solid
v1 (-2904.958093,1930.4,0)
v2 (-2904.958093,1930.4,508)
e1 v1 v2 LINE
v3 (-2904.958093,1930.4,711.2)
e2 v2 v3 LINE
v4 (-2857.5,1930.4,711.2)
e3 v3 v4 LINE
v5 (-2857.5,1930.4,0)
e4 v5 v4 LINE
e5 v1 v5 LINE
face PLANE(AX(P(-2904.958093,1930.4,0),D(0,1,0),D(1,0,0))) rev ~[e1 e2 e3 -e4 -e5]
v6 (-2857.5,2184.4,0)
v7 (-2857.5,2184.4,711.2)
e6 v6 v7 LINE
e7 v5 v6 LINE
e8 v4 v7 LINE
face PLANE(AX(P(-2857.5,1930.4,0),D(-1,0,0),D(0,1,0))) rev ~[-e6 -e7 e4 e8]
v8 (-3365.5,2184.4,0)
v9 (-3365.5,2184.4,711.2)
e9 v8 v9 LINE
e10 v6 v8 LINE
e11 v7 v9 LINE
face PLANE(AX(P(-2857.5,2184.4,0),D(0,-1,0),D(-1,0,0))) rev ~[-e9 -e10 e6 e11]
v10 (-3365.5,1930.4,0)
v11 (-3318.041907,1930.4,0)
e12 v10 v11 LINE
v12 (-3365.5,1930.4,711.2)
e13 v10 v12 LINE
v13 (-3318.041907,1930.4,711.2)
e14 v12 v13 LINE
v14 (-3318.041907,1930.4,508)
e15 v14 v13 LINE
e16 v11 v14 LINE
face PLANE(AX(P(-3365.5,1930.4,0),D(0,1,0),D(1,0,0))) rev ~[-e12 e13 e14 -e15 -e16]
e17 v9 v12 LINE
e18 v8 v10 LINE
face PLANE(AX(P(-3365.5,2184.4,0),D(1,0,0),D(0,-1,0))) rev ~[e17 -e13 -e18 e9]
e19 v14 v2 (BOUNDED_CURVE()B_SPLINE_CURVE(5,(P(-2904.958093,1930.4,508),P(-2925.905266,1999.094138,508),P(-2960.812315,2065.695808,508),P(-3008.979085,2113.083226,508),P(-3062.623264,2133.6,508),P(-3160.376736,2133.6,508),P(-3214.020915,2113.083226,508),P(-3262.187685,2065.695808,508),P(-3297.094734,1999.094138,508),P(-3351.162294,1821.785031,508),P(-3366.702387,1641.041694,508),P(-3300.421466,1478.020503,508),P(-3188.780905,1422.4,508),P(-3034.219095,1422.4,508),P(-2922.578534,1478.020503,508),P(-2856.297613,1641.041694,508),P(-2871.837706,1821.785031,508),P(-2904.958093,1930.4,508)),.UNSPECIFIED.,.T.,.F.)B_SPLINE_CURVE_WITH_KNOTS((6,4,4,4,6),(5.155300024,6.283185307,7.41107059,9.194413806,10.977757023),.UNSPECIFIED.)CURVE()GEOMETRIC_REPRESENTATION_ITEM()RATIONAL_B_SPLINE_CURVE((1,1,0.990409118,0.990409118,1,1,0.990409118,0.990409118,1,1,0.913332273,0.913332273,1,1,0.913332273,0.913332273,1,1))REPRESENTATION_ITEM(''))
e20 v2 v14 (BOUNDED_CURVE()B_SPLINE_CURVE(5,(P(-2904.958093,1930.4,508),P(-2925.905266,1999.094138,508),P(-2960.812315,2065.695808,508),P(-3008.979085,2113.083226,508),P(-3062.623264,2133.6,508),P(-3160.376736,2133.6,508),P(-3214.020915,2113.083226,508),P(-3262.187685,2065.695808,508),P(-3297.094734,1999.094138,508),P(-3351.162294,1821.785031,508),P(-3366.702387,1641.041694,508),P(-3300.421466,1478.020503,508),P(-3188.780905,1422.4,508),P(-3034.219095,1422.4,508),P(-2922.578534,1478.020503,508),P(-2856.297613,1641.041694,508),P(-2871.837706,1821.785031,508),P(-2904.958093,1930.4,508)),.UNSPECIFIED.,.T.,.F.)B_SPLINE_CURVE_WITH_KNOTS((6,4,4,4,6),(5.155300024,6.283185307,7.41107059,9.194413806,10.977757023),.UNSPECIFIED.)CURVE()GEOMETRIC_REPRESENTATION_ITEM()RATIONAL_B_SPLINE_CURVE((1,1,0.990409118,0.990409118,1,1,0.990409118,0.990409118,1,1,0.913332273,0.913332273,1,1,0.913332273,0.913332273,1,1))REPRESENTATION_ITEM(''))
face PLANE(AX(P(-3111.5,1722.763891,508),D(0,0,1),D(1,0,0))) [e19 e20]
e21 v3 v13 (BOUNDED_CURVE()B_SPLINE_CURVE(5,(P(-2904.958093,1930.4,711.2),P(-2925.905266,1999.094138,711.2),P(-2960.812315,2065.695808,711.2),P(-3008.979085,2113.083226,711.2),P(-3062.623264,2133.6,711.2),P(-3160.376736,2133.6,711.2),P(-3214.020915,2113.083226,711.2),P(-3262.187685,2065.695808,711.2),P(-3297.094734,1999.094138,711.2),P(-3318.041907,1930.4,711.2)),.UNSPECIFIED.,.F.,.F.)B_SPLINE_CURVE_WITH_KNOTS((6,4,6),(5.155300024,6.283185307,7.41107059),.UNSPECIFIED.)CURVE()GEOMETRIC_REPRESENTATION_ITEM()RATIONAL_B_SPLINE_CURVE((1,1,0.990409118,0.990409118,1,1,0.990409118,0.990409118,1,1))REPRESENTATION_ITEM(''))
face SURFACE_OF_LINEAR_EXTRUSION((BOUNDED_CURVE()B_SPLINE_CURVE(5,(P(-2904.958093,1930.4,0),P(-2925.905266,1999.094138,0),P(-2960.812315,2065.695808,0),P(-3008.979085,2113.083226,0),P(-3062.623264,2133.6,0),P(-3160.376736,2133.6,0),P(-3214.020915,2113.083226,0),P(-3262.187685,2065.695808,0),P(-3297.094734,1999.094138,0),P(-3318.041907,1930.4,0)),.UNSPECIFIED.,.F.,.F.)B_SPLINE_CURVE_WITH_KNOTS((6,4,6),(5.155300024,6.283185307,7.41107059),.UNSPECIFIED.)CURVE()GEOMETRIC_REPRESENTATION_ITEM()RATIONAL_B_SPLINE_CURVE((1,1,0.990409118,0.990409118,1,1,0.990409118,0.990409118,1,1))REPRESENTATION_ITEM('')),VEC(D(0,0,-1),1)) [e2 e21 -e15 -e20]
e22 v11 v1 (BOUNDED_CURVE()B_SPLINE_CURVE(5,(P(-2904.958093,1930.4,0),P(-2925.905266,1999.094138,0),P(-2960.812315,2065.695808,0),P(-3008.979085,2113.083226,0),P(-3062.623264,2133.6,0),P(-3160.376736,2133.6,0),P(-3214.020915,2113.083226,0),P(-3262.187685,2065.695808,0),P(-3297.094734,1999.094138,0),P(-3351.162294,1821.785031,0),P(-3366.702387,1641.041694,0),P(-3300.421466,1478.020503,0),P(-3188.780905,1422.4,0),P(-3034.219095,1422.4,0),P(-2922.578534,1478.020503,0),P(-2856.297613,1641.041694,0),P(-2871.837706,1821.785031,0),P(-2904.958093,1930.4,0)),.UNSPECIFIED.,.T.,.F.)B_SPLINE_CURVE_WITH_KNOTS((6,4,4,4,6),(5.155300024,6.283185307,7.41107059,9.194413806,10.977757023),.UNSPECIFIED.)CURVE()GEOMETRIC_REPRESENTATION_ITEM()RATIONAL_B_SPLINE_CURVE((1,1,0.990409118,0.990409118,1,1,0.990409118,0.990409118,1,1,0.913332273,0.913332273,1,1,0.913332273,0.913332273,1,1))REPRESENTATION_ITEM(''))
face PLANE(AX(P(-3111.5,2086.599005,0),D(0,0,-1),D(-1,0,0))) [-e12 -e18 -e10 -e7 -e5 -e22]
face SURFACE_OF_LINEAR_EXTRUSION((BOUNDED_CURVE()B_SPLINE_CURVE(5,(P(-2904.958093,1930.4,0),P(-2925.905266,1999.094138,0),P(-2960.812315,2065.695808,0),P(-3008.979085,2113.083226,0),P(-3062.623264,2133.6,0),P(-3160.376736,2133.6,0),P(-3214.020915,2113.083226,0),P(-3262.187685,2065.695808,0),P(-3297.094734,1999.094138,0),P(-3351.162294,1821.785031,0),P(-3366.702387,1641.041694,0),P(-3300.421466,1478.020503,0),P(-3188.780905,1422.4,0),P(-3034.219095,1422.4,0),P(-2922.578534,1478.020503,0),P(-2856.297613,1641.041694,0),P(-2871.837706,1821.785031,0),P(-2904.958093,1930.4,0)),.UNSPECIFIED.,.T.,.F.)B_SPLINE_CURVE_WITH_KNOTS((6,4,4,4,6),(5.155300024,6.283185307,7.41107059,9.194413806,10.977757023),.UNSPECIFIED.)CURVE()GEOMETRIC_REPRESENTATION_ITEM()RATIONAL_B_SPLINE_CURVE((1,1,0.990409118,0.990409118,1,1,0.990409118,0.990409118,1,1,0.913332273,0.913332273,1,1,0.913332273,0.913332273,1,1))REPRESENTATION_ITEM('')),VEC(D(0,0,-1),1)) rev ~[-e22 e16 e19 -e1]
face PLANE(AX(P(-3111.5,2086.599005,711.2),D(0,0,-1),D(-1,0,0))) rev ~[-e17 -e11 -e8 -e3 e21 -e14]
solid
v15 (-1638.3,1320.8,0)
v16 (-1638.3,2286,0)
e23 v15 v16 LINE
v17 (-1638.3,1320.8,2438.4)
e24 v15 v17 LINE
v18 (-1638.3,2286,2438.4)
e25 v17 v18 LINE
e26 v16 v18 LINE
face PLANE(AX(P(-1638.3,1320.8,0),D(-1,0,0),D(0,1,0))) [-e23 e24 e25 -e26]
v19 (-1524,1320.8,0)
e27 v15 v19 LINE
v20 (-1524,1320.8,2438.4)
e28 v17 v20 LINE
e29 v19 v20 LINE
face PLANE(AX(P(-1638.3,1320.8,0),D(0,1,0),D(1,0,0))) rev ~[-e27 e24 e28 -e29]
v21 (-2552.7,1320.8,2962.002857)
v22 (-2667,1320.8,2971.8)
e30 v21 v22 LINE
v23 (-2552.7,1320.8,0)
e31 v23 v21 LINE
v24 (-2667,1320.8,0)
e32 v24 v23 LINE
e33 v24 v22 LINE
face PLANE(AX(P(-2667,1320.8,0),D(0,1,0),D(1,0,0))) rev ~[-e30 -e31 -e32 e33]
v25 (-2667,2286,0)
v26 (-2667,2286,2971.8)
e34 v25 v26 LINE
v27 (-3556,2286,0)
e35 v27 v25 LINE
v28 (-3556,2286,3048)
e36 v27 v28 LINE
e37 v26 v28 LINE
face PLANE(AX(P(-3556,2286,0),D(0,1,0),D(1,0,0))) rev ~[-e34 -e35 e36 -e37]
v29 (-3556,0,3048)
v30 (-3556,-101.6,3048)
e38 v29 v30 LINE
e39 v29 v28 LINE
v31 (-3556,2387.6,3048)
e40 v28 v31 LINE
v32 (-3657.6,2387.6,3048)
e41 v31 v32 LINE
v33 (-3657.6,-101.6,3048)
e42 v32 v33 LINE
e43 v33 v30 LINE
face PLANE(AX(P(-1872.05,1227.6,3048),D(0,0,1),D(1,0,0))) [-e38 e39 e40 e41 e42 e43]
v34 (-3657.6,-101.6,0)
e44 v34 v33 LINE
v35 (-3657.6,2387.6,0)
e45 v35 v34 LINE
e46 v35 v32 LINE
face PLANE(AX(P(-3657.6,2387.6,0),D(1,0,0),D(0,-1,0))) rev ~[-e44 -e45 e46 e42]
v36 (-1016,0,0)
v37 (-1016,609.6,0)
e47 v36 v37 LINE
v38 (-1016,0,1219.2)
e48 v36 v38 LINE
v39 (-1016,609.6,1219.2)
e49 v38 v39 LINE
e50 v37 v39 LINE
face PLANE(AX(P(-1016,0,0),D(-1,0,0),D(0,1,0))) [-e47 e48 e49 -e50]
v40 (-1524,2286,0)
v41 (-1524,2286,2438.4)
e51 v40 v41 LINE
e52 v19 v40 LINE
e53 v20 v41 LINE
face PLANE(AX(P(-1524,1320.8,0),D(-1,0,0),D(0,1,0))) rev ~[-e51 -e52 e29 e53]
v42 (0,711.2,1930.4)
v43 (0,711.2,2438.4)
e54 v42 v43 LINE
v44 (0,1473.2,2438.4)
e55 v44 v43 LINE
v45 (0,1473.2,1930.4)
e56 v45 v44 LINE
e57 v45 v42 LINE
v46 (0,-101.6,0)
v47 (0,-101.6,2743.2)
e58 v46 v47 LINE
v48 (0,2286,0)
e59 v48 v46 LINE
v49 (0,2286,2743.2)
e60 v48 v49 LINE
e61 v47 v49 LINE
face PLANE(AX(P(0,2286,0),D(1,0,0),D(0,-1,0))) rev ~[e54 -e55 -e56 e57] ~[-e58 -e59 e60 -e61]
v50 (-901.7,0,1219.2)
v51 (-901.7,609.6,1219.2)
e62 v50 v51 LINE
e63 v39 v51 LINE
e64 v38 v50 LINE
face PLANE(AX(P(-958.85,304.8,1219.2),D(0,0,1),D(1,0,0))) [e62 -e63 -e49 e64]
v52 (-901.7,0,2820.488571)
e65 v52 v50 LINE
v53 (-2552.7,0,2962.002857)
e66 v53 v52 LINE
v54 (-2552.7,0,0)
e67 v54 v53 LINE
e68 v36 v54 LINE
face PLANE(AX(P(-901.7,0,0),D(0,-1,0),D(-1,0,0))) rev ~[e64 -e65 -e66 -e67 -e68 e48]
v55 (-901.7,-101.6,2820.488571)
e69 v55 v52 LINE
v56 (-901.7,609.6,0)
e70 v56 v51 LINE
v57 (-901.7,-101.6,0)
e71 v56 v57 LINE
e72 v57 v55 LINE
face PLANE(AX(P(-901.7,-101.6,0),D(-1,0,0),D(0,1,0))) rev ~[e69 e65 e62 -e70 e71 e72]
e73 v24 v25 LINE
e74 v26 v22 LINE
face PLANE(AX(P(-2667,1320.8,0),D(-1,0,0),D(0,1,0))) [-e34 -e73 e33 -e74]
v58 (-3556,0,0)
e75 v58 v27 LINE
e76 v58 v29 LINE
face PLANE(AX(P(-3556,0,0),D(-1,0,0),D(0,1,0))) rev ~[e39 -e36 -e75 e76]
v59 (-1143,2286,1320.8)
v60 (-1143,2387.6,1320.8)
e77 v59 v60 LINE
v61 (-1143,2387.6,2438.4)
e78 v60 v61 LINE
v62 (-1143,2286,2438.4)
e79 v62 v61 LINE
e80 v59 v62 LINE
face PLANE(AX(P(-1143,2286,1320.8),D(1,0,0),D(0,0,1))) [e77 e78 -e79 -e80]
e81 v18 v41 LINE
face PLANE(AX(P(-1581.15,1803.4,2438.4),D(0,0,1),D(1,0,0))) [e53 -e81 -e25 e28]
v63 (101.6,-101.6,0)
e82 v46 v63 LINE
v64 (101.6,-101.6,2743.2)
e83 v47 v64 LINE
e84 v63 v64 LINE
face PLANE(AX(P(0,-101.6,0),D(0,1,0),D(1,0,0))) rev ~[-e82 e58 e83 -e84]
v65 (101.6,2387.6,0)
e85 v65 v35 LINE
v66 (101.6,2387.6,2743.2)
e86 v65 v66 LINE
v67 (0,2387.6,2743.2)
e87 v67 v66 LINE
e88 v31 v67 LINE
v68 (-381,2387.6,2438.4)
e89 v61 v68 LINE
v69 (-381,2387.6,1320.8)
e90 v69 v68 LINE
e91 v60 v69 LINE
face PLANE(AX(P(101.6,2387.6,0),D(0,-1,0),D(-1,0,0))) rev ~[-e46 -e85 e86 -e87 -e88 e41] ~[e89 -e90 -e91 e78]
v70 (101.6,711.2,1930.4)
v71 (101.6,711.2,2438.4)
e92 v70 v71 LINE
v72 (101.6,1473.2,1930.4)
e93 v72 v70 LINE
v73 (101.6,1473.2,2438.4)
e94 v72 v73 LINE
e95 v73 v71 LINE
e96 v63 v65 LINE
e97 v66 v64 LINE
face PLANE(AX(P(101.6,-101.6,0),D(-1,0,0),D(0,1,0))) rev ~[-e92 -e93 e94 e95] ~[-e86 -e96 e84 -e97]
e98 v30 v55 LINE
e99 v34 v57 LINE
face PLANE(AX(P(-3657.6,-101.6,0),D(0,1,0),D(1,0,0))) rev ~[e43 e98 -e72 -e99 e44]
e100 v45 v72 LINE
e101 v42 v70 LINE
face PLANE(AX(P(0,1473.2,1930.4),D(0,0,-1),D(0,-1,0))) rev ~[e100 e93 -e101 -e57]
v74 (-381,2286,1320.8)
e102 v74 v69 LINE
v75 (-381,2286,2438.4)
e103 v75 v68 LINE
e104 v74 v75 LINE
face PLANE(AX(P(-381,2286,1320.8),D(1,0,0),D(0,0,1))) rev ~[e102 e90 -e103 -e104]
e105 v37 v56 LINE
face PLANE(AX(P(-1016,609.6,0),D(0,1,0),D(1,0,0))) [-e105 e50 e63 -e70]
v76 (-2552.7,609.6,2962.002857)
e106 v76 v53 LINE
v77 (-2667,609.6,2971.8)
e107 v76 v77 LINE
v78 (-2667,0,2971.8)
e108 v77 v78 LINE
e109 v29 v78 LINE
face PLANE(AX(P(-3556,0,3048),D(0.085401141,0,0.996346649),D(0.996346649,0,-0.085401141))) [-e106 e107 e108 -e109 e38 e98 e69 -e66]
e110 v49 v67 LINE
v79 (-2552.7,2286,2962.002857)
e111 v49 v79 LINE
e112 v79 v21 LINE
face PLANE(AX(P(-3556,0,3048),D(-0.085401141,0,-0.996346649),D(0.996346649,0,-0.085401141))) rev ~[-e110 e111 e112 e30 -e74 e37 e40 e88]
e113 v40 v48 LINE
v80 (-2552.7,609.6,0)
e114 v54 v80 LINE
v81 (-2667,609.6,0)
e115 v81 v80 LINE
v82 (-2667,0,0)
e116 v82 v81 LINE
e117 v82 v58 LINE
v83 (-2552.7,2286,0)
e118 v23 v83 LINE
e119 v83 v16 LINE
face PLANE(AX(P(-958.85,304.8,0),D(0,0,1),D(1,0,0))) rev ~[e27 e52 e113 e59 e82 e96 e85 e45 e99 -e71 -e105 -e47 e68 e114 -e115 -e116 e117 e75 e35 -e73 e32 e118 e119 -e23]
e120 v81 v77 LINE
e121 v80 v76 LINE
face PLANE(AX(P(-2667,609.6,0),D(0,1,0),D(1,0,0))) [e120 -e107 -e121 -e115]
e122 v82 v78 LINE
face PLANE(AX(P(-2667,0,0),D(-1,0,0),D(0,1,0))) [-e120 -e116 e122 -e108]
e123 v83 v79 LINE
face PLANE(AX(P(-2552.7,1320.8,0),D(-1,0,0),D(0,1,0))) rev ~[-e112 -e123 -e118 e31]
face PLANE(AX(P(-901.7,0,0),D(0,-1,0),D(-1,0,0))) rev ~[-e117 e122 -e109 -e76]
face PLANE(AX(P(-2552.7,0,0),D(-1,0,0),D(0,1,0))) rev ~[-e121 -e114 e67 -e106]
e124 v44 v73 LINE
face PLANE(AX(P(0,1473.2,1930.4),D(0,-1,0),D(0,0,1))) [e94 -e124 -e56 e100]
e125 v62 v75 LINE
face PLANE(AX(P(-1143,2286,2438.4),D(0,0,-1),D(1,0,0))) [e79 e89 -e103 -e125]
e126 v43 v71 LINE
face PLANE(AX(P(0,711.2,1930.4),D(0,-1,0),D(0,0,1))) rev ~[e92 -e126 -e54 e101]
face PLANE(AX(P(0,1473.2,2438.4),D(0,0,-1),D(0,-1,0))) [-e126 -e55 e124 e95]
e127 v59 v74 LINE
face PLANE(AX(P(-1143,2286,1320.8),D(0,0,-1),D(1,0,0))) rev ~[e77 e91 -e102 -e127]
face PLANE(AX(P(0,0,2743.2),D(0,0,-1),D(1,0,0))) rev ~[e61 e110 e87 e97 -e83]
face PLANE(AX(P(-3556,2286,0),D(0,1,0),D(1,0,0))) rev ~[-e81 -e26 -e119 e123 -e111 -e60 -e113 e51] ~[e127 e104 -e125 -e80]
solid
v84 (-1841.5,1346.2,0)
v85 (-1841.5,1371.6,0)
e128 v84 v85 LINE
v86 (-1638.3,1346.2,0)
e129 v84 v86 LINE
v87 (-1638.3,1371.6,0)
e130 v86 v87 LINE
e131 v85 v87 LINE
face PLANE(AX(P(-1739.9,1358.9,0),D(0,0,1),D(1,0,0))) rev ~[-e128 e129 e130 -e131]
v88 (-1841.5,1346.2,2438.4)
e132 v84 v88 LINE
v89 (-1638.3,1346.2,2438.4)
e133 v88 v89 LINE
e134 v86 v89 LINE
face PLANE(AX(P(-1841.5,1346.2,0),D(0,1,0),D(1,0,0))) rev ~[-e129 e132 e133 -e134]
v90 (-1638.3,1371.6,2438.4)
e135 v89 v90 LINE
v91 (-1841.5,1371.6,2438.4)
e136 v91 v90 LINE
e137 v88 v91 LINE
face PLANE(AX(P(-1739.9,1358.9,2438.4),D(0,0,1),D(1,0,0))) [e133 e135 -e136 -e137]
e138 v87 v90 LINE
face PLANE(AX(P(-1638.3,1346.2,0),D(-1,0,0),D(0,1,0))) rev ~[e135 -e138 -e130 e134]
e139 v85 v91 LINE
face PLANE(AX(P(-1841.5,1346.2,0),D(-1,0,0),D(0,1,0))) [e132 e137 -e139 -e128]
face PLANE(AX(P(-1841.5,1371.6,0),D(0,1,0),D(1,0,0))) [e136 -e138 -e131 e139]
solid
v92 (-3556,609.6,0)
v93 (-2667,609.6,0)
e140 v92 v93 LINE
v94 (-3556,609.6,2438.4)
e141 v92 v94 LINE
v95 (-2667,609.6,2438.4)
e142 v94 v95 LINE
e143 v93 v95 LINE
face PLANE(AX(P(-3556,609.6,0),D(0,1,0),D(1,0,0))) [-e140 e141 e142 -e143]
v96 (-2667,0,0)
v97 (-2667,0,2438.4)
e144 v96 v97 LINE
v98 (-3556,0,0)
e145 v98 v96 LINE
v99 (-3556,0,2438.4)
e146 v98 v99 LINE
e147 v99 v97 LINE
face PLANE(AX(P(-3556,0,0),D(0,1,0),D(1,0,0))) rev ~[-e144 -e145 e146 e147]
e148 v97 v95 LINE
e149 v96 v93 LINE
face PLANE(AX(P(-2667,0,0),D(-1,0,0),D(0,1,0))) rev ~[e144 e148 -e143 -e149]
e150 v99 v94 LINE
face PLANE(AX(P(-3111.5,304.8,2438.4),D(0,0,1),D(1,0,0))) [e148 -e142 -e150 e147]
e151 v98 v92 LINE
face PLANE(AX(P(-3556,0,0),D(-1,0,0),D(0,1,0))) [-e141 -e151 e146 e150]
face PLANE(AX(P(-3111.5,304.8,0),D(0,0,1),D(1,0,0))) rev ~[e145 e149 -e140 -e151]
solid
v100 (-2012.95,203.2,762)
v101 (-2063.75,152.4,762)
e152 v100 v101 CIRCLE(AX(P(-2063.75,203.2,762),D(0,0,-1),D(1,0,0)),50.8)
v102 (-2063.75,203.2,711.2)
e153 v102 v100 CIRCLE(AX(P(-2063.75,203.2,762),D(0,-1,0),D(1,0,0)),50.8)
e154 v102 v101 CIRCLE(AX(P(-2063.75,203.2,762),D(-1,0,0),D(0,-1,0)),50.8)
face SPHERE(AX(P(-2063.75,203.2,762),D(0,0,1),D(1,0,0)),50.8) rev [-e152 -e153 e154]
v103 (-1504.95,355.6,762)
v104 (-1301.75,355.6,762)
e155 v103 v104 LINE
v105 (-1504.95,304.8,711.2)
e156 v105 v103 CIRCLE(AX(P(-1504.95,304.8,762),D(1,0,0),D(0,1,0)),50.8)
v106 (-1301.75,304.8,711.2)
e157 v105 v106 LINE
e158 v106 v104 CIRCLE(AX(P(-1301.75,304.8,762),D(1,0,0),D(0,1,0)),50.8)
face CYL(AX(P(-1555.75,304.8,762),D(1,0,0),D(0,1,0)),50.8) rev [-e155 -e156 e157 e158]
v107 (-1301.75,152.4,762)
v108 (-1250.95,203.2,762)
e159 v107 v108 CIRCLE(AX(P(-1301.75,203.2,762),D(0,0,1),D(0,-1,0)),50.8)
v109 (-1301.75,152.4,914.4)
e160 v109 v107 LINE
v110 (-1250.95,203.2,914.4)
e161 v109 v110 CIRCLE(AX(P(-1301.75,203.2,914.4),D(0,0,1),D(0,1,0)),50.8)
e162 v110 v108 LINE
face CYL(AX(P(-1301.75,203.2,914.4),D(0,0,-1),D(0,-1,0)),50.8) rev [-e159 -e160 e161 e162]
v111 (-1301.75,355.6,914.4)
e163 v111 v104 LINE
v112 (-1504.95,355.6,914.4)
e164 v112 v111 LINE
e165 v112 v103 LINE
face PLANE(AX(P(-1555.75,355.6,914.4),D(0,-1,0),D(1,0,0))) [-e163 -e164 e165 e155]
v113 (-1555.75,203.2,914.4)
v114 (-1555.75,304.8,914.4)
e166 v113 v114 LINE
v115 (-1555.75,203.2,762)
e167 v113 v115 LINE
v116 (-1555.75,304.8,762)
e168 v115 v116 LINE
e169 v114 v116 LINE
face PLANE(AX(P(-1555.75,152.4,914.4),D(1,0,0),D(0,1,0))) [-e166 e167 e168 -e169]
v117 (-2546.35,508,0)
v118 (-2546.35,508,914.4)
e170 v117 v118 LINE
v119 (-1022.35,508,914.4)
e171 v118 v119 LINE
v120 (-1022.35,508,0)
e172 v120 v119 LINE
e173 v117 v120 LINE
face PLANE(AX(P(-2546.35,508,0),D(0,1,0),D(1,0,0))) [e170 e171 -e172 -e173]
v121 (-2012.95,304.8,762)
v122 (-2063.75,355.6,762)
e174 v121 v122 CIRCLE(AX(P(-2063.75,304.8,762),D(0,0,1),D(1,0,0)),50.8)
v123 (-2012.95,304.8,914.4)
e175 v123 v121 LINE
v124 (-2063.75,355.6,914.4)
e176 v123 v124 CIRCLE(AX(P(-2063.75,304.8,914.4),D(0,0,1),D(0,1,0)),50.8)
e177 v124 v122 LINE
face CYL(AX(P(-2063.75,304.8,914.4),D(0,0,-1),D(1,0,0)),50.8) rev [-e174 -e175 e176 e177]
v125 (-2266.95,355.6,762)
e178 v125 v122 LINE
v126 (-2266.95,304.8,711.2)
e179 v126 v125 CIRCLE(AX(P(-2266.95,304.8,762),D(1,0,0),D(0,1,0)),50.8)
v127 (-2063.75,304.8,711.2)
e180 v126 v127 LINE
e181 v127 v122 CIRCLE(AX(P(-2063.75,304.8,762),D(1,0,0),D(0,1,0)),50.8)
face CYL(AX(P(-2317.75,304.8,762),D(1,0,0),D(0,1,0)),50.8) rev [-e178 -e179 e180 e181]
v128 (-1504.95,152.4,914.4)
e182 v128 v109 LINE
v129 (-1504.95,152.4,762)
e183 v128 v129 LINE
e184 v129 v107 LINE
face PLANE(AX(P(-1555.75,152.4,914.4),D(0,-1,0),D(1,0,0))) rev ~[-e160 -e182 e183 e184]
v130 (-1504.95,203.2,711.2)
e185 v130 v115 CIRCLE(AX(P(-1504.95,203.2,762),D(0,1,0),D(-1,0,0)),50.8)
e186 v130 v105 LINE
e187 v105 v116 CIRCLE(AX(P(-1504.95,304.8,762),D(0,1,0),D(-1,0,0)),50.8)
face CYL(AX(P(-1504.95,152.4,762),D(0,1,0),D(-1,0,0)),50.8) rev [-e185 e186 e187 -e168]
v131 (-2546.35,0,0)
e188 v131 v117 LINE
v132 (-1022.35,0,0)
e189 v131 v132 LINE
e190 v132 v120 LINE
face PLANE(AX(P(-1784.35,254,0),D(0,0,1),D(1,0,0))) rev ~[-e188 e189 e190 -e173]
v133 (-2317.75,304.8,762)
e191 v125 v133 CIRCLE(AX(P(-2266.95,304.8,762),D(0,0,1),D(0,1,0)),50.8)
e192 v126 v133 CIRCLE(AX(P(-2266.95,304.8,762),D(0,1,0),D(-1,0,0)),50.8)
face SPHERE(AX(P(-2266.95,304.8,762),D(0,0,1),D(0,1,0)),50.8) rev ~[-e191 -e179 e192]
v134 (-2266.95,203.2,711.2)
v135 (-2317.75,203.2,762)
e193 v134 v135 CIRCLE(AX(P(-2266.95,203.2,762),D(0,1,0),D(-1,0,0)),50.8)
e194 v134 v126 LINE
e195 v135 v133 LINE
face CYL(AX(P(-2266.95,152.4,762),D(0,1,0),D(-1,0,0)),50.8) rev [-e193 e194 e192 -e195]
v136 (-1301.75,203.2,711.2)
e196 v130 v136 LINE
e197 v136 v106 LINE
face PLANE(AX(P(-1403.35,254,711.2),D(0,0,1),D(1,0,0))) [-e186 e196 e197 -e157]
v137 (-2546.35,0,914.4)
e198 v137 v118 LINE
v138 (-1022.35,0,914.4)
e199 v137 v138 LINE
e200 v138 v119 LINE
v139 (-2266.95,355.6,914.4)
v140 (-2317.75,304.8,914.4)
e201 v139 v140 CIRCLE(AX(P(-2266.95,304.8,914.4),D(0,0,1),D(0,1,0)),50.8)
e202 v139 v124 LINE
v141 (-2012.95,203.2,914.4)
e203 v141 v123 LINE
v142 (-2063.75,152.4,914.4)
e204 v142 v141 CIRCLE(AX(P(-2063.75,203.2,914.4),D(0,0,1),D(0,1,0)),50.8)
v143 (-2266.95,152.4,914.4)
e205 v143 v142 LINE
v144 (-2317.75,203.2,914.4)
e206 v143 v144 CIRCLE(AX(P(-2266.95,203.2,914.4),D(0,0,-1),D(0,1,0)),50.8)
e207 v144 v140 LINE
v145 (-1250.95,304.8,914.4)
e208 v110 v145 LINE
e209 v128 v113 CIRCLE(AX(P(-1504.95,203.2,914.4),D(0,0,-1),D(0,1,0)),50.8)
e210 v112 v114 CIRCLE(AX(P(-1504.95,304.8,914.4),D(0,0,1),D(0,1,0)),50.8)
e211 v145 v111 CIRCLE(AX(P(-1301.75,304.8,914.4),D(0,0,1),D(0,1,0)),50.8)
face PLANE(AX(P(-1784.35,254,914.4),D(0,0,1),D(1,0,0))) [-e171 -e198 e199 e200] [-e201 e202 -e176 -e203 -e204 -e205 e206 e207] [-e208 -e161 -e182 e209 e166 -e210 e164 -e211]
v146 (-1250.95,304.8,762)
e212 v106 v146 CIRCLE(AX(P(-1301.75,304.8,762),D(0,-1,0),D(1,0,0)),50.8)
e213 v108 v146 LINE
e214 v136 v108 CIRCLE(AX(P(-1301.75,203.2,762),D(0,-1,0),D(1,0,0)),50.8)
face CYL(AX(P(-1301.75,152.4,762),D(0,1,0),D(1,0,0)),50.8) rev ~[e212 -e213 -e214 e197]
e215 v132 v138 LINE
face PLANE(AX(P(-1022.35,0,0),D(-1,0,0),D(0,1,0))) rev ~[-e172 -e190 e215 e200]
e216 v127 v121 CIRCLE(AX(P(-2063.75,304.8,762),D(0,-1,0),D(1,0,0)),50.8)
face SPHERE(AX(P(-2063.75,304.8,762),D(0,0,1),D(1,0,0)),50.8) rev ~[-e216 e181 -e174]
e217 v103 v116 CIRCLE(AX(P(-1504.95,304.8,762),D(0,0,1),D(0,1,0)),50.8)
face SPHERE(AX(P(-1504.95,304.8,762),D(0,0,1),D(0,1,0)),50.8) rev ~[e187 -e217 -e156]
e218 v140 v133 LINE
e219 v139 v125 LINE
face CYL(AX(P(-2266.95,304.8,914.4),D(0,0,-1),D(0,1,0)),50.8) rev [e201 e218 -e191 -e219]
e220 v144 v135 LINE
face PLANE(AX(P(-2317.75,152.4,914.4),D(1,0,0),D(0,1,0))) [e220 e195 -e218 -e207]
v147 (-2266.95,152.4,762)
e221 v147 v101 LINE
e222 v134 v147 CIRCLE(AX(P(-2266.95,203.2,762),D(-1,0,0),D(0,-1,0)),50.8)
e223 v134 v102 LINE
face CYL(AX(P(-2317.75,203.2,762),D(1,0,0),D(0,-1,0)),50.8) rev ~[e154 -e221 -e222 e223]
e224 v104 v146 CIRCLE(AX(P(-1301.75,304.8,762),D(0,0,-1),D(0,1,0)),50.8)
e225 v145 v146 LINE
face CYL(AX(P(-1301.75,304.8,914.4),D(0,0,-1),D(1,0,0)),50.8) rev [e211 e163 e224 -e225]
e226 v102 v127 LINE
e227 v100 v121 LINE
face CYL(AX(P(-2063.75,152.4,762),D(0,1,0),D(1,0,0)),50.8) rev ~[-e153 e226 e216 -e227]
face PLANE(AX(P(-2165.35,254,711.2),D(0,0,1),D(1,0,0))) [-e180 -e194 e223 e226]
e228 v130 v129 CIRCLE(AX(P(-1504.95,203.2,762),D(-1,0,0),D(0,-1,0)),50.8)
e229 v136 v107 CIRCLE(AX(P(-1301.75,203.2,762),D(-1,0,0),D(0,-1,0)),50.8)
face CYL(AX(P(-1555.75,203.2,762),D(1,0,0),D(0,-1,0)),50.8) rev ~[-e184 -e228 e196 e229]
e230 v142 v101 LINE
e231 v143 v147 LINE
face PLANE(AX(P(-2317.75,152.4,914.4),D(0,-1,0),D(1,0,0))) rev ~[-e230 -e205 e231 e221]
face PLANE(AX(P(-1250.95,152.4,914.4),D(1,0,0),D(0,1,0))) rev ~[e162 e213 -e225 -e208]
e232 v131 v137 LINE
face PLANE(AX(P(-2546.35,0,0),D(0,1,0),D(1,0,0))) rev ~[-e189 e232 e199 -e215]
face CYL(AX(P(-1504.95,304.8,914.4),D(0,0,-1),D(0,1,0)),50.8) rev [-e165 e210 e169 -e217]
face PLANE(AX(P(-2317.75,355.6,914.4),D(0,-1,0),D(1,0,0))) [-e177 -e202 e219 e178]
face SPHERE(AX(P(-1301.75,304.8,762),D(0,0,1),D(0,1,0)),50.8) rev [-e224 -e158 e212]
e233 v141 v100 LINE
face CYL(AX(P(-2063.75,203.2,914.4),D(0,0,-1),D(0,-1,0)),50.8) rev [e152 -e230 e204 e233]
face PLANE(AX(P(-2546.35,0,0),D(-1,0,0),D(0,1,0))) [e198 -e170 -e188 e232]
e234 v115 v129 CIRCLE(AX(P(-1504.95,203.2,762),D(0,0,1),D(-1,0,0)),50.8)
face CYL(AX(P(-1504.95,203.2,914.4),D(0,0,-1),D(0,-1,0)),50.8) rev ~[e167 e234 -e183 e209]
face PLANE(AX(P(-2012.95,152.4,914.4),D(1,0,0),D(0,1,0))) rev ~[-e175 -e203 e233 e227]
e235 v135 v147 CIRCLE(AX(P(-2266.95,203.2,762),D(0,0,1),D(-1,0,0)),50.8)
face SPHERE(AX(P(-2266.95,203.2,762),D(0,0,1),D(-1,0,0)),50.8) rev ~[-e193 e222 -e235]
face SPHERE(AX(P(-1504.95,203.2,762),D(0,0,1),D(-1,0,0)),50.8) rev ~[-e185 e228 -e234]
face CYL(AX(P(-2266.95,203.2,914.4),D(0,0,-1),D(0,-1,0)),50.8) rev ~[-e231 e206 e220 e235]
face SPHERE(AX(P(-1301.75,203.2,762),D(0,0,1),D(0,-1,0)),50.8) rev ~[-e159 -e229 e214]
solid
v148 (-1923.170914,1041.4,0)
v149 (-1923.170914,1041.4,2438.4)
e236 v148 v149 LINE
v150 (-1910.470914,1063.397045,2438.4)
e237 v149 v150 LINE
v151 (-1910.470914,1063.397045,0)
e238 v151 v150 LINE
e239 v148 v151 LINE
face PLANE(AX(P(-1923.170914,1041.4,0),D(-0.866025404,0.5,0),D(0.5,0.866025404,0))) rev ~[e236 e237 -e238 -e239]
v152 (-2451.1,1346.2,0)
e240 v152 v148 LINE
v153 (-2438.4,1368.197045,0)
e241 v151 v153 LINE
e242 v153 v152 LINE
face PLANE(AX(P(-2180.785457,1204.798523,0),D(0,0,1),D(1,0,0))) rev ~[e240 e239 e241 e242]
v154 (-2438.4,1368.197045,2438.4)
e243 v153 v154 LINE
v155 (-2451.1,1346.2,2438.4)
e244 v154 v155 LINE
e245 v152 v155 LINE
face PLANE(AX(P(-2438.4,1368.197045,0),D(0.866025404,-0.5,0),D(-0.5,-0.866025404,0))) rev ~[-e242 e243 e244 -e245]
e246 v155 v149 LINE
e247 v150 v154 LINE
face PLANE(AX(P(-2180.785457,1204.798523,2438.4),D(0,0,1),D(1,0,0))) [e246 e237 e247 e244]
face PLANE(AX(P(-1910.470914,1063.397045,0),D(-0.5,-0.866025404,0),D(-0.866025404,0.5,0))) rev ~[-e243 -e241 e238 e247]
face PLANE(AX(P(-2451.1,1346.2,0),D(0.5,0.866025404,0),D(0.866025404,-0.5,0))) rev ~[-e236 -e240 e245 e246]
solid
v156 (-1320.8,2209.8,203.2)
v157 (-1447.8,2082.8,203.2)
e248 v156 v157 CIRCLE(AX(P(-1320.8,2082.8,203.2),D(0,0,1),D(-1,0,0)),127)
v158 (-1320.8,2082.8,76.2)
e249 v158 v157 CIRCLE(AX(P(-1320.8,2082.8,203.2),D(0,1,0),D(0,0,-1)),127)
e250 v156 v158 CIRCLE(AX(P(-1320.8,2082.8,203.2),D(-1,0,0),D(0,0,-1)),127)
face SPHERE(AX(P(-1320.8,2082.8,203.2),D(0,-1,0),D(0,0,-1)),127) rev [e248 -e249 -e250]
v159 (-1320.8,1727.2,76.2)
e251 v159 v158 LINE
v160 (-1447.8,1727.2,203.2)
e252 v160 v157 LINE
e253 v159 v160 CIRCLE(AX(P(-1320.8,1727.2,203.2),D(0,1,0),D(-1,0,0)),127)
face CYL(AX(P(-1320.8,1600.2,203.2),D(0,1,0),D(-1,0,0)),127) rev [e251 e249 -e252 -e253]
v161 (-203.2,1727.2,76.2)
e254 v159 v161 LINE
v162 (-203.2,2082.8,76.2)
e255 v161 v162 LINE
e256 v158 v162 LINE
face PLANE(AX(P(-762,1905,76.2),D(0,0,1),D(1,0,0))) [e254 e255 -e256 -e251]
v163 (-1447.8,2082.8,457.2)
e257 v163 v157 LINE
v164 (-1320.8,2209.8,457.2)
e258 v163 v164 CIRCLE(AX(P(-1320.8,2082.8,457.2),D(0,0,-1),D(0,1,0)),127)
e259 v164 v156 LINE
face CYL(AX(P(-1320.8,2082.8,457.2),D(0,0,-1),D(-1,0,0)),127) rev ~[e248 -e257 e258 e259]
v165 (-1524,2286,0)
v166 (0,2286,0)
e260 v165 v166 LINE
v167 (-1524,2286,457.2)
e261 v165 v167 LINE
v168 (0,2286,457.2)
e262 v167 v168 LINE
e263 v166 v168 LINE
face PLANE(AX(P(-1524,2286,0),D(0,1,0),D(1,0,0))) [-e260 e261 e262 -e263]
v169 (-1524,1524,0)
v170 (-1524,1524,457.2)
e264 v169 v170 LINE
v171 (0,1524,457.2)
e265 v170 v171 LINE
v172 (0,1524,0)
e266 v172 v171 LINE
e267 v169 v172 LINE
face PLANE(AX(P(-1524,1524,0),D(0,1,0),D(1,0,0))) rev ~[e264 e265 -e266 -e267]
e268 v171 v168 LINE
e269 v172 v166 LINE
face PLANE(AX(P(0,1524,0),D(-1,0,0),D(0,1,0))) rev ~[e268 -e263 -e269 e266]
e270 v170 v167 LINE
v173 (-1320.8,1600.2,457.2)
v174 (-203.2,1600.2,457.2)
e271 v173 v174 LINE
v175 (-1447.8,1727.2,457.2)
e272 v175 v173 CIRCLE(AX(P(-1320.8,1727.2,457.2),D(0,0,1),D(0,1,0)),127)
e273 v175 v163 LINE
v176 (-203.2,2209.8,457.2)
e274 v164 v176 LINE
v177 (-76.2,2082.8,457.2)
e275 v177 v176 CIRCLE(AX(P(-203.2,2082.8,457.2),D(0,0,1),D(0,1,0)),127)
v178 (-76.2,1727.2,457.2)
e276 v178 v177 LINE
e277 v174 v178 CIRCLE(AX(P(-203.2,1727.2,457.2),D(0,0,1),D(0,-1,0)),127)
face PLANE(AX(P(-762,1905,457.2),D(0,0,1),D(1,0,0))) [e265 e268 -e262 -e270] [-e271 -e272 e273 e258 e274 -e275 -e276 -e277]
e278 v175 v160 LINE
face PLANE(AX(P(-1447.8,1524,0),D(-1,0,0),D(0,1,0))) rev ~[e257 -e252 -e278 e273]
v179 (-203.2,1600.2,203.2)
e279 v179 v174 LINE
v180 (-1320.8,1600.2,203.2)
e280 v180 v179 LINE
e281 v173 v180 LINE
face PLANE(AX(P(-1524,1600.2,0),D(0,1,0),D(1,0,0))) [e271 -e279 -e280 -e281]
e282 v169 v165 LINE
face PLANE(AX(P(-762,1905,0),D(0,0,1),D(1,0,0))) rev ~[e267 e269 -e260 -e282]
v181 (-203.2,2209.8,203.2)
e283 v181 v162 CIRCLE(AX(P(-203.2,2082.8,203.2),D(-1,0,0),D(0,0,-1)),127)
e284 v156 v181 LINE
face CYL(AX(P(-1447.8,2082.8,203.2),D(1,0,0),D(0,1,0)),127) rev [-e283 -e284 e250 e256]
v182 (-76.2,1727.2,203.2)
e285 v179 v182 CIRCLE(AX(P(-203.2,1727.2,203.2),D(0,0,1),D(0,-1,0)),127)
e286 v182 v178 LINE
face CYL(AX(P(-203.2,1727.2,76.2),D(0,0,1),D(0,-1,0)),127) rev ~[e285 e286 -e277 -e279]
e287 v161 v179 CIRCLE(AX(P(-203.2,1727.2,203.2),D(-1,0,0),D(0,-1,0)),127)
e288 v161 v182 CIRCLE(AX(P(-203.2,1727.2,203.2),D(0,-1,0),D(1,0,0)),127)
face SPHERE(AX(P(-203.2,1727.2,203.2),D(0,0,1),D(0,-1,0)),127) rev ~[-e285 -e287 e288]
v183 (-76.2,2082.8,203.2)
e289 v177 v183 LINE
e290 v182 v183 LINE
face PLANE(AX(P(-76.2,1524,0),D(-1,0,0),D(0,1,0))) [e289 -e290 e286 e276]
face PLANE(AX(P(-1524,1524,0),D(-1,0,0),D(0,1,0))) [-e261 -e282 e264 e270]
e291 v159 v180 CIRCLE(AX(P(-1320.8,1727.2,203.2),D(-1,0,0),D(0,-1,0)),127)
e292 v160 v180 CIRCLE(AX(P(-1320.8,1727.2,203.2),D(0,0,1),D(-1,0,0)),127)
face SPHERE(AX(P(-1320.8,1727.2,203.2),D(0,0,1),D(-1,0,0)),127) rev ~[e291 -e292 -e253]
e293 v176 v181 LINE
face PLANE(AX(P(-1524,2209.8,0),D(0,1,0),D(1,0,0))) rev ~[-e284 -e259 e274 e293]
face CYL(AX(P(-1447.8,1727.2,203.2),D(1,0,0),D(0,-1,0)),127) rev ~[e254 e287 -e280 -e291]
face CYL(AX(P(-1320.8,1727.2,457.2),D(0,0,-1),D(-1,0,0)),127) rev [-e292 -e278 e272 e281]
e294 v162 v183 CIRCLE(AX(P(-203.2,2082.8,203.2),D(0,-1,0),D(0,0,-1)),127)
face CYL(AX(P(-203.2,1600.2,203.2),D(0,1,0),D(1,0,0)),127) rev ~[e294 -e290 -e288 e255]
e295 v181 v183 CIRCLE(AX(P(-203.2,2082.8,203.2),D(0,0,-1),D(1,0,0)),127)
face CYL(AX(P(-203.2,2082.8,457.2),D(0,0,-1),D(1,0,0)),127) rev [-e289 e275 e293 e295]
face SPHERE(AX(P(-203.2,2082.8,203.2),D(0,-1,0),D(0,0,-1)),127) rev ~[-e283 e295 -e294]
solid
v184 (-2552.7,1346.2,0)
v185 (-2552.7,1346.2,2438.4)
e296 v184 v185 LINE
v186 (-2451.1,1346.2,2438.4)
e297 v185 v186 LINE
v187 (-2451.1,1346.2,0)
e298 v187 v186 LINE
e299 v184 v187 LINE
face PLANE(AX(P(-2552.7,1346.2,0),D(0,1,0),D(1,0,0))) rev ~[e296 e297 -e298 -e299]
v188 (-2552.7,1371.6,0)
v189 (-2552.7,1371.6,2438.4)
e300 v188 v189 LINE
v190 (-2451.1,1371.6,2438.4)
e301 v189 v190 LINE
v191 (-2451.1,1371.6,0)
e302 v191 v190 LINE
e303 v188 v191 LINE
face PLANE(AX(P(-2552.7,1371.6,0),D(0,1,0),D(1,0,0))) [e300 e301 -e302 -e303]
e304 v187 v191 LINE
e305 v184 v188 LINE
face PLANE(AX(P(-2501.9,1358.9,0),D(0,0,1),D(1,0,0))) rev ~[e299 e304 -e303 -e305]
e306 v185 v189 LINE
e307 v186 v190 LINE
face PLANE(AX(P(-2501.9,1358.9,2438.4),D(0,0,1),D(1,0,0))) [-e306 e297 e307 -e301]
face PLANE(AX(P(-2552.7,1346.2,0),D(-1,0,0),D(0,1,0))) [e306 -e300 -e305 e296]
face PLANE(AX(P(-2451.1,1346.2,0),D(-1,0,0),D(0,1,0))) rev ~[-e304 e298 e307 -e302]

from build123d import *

# Parameters (mm, degrees)
F2_DEPTH      = 3048
F1_W          = 114.3
F1_H          = 965.2
F1_H_2        = 609.6
F3_DEPTH      = 3048
F4_DEPTH      = 2438.4
F5_W          = 101.6
F5_H          = 304.8
F6_DEPTH      = 2387.601
F6_DEPTH_BACK = 101.601
F7_W          = 1524
F7_H          = 762
F8_DEPTH      = 457.2
F9_T          = -76.2
F10_R         = 127
F12_DEPTH     = 2438.4
F11_W         = 203.2
F11_H         = 25.4
F13_DEPTH     = 2438.4
F11_W_2       = 101.6
F14_W         = 762
F14_H         = 1117.6
F15_DEPTH     = 101.601
F16_W         = 1524
F16_H         = 508
F17_DEPTH     = 914.4
F18_W         = 304.8
F18_H         = 203.2
F19_DEPTH     = 203.2
F20_R         = 50.8
F22_DEPTH     = 508
F23_DEPTH     = 711.2
F24_W         = 889
F24_H         = 609.6
F25_DEPTH     = 2438.4
F26_W         = 762
F26_H         = 508
F27_DEPTH     = 101.601
F28_DEPTH     = 1219.2


with BuildPart() as f2:
    # F0 (on Top) → F2 (new body)
    with BuildSketch(Plane.XY):
        Polygon((-3556, 0), (-3556, 2286), (0, 2286), (0, -101.6), (101.6, -101.6), (101.6, 2387.6), (-3657.6, 2387.6), (-3657.6, -101.6), (-901.7, -101.6), (-901.7, 0), align=None)
    extrude(amount=F2_DEPTH)

    # F1 (on Top) → F3 (join, through all)
    with BuildSketch(Plane.XY):
        with Locations((-2609.85, 1803.4)):
            Rectangle(F1_W, F1_H)
        with Locations((-2609.85, 304.8)):
            Rectangle(F1_W, F1_H_2)
    extrude(amount=F3_DEPTH)

    # F1 (on Top) → F4 (join)
    with BuildSketch(Plane.XY):
        with Locations((-1581.15, 1803.4)):
            Rectangle(F1_W, F1_H)
    extrude(amount=F4_DEPTH)

    # F5 (on Front) → F6 (cut, two sides)
    with BuildSketch(Plane.XZ) as f6_sk:
        Polygon((0, 3048), (-3556, 3048), (0, 2743.2), align=None)
        with Locations((50.8, 2895.6)):
            Rectangle(F5_W, F5_H)
    extrude(amount=-F6_DEPTH, mode=Mode.SUBTRACT)
    extrude(f6_sk.sketch, amount=F6_DEPTH_BACK, mode=Mode.SUBTRACT)

    # F14 (on face) → F15 (cut, through all)
    with BuildSketch(Plane.XZ.offset(-2286)):
        with Locations((-762, 1879.6)):
            Rectangle(F14_W, F14_H)
    extrude(amount=-F15_DEPTH, mode=Mode.SUBTRACT)

    # F26 (on face) → F27 (cut, through all)
    with BuildSketch(Plane(origin=(0, 0, 0), x_dir=(0, -1, 0), z_dir=(-1, 0, 0))):
        with Locations((-1092.2, 2184.4)):
            Rectangle(F26_W, F26_H)
    extrude(amount=-F27_DEPTH, mode=Mode.SUBTRACT)

    # F1 (on Top) → F28 (join)
    with BuildSketch(Plane.XY):
        with Locations((-958.85, 304.8)):
            Rectangle(F1_W, F1_H_2)
    extrude(amount=F28_DEPTH)


with BuildPart() as f8:
    # F7 (on Top) → F8 (new body)
    with BuildSketch(Plane.XY):
        with Locations((-762, 1905)):
            Rectangle(F7_W, F7_H)
    extrude(amount=F8_DEPTH)

    # F9
    f9_openings = [f8.faces().sort_by_distance(p)[0] for p in [
        (-762, 1905, 457.2),
    ]]
    offset(amount=F9_T, openings=f9_openings)

    # F10
    f10_edges = [f8.edges().sort_by_distance(p)[0] for p in [
        (-1447.8, 1600.2, 266.7),
        (-76.2, 1600.2, 266.7),
        (-1447.8, 1905, 76.2),
        (-762, 1600.2, 76.2),
        (-76.2, 1905, 76.2),
        (-762, 2209.8, 76.2),
        (-76.2, 2209.8, 266.7),
        (-1447.8, 2209.8, 266.7),
    ]]
    fillet(f10_edges, radius=F10_R)


with BuildPart() as f12:
    # F11 (on Top) → F12 (new body, through all)
    with BuildSketch(Plane.XY):
        Polygon((-2451.1, 1346.2), (-1923.170913853, 1041.4), (-1910.470913853, 1063.3970452561), (-2438.4, 1368.1970452561), align=None)
    extrude(amount=F12_DEPTH)


with BuildPart() as f13:
    # F11 (on Top) → F13 (new body, through all)
    with BuildSketch(Plane.XY):
        with Locations((-1739.9, 1358.9)):
            Rectangle(F11_W, F11_H)
    extrude(amount=F13_DEPTH)


with BuildPart() as f13b:
    # F11 (on Top) → F13, piece 2 (new body, through all)
    with BuildSketch(Plane.XY):
        with Locations((-2501.9, 1358.9)):
            Rectangle(F11_W_2, F11_H)
    extrude(amount=F13_DEPTH)


with BuildPart() as f17:
    # F16 (on Top) → F17 (new body)
    with BuildSketch(Plane.XY):
        with Locations((-1784.35, 254)):
            Rectangle(F16_W, F16_H)
    extrude(amount=F17_DEPTH)

    # F18 (on face) → F19 (cut)
    with BuildSketch(Plane.XY.offset(914.4)):
        with Locations((-2165.35, 254)):
            Rectangle(F18_W, F18_H)
        with Locations((-1403.35, 254)):
            Rectangle(F18_W, F18_H)
    extrude(amount=-F19_DEPTH, mode=Mode.SUBTRACT)

    # F20
    f20_edges = [f17.edges().sort_by_distance(p)[0] for p in [
        (-2317.75, 355.6, 812.8),
        (-2012.95, 355.6, 812.8),
        (-2317.75, 152.4, 812.8),
        (-2012.95, 152.4, 812.8),
        (-2012.95, 254, 711.2),
        (-2165.35, 355.6, 711.2),
        (-2317.75, 254, 711.2),
        (-2165.35, 152.4, 711.2),
        (-1250.95, 152.4, 812.8),
        (-1555.75, 152.4, 812.8),
        (-1250.95, 355.6, 812.8),
        (-1555.75, 355.6, 812.8),
        (-1403.35, 355.6, 711.2),
        (-1555.75, 254, 711.2),
        (-1403.35, 152.4, 711.2),
        (-1250.95, 254, 711.2),
    ]]
    fillet(f20_edges, radius=F20_R)


with BuildPart() as f22:
    # F21 (on Top) → F22 (new body)
    with BuildSketch(Plane.XY):
        with BuildLine():
            Line((-2904.9580933959, 1930.4), (-3318.0419066041, 1930.4))
            add(Edge.make_bspline(
                [(-3318.0419066041, 1930.4), (-3472.9483365572, 1422.4), (-3111.5, 1422.4), (-2750.0516634428, 1422.4), (-2904.9580933959, 1930.4)],
                knots=[1.1278852827, 1.1278852827, 1.1278852827, 3.1415926536, 3.1415926536, 5.1553000245, 5.1553000245, 5.1553000245], degree=2, weights=[1, 0.5345224838, 1, 0.5345224838, 1]))
        make_face()
        with BuildLine():
            add(Edge.make_bspline(
                [(-2904.9580933959, 1930.4), (-2966.9206653771, 2133.6), (-3111.5, 2133.6)],
                knots=[5.1553000245, 5.1553000245, 5.1553000245, 6.2831853072, 6.2831853072, 6.2831853072], degree=2, weights=[1, 0.8451542547, 1]))
            add(Edge.make_bspline(
                [(-3111.5, 2133.6), (-3256.0793346229, 2133.6), (-3318.0419066041, 1930.4)],
                knots=[0, 0, 0, 1.1278852827, 1.1278852827, 1.1278852827], degree=2, weights=[1, 0.8451542547, 1]))
            Line((-3318.0419066041, 1930.4), (-2904.9580933959, 1930.4))
        make_face()
    extrude(amount=F22_DEPTH)

    # F21 (on Top) → F23 (join)
    with BuildSketch(Plane.XY):
        with BuildLine():
            add(Edge.make_bspline(
                [(-3111.5, 2133.6), (-3256.0793346229, 2133.6), (-3318.0419066041, 1930.4)],
                knots=[0, 0, 0, 1.1278852827, 1.1278852827, 1.1278852827], degree=2, weights=[1, 0.8451542547, 1]))
            add(Edge.make_bspline(
                [(-2904.9580933959, 1930.4), (-2966.9206653771, 2133.6), (-3111.5, 2133.6)],
                knots=[5.1553000245, 5.1553000245, 5.1553000245, 6.2831853072, 6.2831853072, 6.2831853072], degree=2, weights=[1, 0.8451542547, 1]))
            Line((-2904.9580933959, 1930.4), (-2857.5, 1930.4))
            Line((-2857.5, 1930.4), (-2857.5, 2184.4))
            Line((-2857.5, 2184.4), (-3365.5, 2184.4))
            Line((-3365.5, 2184.4), (-3365.5, 1930.4))
            Line((-3365.5, 1930.4), (-3318.0419066041, 1930.4))
        make_face()
    extrude(amount=F23_DEPTH)


with BuildPart() as f25:
    # F24 (on Top) → F25 (new body)
    with BuildSketch(Plane.XY):
        with Locations((-3111.5, 304.8)):
            Rectangle(F24_W, F24_H)
    extrude(amount=F25_DEPTH)


solid = Compound([f2.part, f8.part, f12.part, f13.part, f13b.part, f17.part, f22.part, f25.part])
